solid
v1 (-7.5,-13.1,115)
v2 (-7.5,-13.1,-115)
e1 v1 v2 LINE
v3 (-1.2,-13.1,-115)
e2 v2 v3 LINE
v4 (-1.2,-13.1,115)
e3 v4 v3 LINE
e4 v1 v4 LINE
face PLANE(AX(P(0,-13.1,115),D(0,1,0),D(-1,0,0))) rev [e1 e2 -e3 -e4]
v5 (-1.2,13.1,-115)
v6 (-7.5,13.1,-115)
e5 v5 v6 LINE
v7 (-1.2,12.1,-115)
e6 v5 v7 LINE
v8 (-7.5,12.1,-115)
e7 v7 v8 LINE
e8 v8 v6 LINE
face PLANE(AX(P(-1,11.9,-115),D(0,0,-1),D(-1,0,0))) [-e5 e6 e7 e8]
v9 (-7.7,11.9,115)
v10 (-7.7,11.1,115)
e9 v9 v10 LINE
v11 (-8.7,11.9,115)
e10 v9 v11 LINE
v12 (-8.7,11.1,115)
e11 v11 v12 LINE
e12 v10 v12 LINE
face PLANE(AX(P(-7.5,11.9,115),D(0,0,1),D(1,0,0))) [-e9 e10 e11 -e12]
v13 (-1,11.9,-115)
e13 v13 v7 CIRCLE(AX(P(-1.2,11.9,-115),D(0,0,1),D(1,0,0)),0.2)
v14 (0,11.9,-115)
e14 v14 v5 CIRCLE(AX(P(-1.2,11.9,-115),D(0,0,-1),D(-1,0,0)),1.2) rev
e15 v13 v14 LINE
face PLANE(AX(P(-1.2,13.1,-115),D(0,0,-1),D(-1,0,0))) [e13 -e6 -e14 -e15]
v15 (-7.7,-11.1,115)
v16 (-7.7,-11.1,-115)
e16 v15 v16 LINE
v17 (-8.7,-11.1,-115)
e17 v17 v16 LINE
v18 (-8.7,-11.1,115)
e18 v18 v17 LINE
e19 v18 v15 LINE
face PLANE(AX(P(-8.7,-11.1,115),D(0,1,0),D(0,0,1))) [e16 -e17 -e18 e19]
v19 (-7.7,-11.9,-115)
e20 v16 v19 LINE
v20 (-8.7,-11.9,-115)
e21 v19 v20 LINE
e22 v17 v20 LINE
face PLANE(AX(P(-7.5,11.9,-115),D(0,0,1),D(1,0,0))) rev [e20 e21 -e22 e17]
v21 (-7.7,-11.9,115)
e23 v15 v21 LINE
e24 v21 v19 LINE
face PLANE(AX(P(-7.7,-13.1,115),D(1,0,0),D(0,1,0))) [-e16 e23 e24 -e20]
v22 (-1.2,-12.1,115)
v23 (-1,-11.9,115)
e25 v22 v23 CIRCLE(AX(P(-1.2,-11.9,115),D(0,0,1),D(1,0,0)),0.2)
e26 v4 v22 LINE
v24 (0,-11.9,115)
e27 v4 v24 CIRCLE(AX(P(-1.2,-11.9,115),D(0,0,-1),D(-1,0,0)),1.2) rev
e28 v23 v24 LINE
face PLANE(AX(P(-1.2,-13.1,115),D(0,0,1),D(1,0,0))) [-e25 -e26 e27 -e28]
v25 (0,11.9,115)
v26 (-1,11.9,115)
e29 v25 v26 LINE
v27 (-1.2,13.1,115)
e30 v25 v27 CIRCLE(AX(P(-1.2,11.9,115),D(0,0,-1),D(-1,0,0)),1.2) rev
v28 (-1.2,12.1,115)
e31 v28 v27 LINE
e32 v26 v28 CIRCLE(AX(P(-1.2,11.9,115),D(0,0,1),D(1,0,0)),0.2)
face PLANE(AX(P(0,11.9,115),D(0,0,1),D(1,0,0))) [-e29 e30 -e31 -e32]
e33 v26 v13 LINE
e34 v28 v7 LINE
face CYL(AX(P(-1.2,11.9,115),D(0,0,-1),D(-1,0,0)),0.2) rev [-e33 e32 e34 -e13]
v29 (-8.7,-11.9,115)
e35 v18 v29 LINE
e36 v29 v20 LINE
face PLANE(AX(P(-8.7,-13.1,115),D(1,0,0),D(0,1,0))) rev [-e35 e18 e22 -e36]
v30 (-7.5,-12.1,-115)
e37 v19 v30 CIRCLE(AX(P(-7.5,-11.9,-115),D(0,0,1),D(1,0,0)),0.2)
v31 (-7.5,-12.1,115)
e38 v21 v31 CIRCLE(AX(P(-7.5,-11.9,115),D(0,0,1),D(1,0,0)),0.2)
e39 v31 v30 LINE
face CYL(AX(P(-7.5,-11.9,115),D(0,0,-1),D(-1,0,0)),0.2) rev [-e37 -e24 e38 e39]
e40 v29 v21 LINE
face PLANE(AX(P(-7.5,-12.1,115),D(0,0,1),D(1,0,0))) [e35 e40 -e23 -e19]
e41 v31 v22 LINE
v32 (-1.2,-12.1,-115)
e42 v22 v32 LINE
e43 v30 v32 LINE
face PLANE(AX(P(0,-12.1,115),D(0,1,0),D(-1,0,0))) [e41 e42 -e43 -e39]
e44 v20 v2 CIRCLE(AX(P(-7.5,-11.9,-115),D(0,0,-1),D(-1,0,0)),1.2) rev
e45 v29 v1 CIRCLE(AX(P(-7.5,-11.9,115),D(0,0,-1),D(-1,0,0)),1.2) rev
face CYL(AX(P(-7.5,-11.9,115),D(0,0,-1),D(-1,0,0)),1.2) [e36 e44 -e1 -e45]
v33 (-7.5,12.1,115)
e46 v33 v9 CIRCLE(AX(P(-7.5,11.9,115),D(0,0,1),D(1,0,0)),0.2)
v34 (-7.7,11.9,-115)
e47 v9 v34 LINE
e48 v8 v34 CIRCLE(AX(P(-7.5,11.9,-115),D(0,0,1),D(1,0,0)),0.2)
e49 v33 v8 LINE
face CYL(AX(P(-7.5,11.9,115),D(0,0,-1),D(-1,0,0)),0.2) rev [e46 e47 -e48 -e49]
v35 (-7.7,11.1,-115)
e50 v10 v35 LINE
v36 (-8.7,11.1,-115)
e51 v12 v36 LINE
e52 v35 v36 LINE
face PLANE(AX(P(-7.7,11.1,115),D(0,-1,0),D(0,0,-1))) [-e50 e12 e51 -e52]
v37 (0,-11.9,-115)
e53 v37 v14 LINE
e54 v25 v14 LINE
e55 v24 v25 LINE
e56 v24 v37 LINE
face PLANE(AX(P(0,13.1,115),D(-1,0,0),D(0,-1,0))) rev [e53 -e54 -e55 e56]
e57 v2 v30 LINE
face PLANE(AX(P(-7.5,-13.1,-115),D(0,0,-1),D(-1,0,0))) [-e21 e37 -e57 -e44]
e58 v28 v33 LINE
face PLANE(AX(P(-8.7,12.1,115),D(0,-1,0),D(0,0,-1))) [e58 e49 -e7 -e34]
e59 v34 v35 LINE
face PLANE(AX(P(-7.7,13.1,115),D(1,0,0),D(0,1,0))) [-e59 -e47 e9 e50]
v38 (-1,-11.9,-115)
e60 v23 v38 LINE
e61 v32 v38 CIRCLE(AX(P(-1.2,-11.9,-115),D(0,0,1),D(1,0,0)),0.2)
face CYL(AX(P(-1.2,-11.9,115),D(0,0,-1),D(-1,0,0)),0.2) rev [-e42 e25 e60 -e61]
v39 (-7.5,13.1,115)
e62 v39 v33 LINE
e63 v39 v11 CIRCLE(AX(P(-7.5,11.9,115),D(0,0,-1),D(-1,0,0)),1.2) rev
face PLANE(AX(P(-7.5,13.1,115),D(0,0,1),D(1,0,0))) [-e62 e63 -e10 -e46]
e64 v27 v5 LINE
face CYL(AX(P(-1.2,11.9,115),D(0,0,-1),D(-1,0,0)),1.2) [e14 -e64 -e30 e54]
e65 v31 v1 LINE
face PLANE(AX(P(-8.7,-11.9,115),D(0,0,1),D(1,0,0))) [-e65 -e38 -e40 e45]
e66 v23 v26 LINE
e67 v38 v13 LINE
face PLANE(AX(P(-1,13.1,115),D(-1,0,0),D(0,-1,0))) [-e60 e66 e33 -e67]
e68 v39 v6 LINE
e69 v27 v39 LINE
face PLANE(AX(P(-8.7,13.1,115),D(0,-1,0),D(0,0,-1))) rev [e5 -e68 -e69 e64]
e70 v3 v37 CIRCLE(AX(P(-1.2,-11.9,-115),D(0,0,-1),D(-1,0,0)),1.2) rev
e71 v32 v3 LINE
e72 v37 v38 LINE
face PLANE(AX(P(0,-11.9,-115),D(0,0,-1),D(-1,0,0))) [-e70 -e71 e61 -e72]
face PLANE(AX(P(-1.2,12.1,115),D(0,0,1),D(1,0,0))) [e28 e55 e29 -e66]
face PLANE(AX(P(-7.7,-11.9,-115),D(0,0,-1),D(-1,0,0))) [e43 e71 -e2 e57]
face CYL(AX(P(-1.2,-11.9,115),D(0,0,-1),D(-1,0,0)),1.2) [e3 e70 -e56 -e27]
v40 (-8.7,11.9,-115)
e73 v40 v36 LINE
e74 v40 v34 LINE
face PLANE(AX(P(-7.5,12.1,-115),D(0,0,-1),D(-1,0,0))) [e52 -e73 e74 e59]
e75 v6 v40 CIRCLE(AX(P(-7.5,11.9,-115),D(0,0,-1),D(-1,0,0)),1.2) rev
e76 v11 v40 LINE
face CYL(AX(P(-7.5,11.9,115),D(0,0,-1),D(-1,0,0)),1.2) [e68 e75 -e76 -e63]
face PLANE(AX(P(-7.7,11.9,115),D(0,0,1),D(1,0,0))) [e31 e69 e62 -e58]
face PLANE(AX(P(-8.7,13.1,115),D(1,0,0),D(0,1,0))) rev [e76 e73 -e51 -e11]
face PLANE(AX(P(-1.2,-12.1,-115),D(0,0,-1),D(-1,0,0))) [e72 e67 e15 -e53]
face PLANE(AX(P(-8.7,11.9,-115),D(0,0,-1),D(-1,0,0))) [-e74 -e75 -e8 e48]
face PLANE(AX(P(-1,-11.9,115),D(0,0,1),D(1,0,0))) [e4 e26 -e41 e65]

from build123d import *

# Parameters (mm, degrees)
SM_BASE_FLANGE_1_DEPTH = 115


# Sheet-metal steps are written as plain solids
with BuildPart() as part:
    # Sketch 1 → Базовая кромка1 (new, symmetric)
    with BuildSketch(Plane.XY):
        with BuildLine():
            Line((-8.7, 11.1), (-8.7, 11.9))
            ThreePointArc((-8.7, 11.9), (-8.348528137, 12.748528137), (-7.5, 13.1))
            Line((-7.5, 13.1), (-1.2, 13.1))
            ThreePointArc((-1.2, 13.1), (-0.351471863, 12.748528137), (0, 11.9))
            Line((0, 11.9), (0, -11.9))
            ThreePointArc((0, -11.9), (-0.351471863, -12.748528137), (-1.2, -13.1))
            Line((-1.2, -13.1), (-7.5, -13.1))
            ThreePointArc((-7.5, -13.1), (-8.348528137, -12.748528137), (-8.7, -11.9))
            Line((-8.7, -11.9), (-8.7, -11.1))
            Line((-8.7, -11.1), (-7.7, -11.1))
            Line((-7.7, -11.1), (-7.7, -11.9))
            ThreePointArc((-7.7, -11.9), (-7.641421356, -12.041421356), (-7.5, -12.1))
            Line((-7.5, -12.1), (-1.2, -12.1))
            ThreePointArc((-1.2, -12.1), (-1.058578644, -12.041421356), (-1, -11.9))
            Line((-1, -11.9), (-1, 11.9))
            ThreePointArc((-1, 11.9), (-1.058578644, 12.041421356), (-1.2, 12.1))
            Line((-1.2, 12.1), (-7.5, 12.1))
            ThreePointArc((-7.5, 12.1), (-7.641421356, 12.041421356), (-7.7, 11.9))
            Line((-7.7, 11.9), (-7.7, 11.1))
            Line((-7.7, 11.1), (-8.7, 11.1))
        make_face()
    extrude(amount=SM_BASE_FLANGE_1_DEPTH, both=True)


solid = part.part
